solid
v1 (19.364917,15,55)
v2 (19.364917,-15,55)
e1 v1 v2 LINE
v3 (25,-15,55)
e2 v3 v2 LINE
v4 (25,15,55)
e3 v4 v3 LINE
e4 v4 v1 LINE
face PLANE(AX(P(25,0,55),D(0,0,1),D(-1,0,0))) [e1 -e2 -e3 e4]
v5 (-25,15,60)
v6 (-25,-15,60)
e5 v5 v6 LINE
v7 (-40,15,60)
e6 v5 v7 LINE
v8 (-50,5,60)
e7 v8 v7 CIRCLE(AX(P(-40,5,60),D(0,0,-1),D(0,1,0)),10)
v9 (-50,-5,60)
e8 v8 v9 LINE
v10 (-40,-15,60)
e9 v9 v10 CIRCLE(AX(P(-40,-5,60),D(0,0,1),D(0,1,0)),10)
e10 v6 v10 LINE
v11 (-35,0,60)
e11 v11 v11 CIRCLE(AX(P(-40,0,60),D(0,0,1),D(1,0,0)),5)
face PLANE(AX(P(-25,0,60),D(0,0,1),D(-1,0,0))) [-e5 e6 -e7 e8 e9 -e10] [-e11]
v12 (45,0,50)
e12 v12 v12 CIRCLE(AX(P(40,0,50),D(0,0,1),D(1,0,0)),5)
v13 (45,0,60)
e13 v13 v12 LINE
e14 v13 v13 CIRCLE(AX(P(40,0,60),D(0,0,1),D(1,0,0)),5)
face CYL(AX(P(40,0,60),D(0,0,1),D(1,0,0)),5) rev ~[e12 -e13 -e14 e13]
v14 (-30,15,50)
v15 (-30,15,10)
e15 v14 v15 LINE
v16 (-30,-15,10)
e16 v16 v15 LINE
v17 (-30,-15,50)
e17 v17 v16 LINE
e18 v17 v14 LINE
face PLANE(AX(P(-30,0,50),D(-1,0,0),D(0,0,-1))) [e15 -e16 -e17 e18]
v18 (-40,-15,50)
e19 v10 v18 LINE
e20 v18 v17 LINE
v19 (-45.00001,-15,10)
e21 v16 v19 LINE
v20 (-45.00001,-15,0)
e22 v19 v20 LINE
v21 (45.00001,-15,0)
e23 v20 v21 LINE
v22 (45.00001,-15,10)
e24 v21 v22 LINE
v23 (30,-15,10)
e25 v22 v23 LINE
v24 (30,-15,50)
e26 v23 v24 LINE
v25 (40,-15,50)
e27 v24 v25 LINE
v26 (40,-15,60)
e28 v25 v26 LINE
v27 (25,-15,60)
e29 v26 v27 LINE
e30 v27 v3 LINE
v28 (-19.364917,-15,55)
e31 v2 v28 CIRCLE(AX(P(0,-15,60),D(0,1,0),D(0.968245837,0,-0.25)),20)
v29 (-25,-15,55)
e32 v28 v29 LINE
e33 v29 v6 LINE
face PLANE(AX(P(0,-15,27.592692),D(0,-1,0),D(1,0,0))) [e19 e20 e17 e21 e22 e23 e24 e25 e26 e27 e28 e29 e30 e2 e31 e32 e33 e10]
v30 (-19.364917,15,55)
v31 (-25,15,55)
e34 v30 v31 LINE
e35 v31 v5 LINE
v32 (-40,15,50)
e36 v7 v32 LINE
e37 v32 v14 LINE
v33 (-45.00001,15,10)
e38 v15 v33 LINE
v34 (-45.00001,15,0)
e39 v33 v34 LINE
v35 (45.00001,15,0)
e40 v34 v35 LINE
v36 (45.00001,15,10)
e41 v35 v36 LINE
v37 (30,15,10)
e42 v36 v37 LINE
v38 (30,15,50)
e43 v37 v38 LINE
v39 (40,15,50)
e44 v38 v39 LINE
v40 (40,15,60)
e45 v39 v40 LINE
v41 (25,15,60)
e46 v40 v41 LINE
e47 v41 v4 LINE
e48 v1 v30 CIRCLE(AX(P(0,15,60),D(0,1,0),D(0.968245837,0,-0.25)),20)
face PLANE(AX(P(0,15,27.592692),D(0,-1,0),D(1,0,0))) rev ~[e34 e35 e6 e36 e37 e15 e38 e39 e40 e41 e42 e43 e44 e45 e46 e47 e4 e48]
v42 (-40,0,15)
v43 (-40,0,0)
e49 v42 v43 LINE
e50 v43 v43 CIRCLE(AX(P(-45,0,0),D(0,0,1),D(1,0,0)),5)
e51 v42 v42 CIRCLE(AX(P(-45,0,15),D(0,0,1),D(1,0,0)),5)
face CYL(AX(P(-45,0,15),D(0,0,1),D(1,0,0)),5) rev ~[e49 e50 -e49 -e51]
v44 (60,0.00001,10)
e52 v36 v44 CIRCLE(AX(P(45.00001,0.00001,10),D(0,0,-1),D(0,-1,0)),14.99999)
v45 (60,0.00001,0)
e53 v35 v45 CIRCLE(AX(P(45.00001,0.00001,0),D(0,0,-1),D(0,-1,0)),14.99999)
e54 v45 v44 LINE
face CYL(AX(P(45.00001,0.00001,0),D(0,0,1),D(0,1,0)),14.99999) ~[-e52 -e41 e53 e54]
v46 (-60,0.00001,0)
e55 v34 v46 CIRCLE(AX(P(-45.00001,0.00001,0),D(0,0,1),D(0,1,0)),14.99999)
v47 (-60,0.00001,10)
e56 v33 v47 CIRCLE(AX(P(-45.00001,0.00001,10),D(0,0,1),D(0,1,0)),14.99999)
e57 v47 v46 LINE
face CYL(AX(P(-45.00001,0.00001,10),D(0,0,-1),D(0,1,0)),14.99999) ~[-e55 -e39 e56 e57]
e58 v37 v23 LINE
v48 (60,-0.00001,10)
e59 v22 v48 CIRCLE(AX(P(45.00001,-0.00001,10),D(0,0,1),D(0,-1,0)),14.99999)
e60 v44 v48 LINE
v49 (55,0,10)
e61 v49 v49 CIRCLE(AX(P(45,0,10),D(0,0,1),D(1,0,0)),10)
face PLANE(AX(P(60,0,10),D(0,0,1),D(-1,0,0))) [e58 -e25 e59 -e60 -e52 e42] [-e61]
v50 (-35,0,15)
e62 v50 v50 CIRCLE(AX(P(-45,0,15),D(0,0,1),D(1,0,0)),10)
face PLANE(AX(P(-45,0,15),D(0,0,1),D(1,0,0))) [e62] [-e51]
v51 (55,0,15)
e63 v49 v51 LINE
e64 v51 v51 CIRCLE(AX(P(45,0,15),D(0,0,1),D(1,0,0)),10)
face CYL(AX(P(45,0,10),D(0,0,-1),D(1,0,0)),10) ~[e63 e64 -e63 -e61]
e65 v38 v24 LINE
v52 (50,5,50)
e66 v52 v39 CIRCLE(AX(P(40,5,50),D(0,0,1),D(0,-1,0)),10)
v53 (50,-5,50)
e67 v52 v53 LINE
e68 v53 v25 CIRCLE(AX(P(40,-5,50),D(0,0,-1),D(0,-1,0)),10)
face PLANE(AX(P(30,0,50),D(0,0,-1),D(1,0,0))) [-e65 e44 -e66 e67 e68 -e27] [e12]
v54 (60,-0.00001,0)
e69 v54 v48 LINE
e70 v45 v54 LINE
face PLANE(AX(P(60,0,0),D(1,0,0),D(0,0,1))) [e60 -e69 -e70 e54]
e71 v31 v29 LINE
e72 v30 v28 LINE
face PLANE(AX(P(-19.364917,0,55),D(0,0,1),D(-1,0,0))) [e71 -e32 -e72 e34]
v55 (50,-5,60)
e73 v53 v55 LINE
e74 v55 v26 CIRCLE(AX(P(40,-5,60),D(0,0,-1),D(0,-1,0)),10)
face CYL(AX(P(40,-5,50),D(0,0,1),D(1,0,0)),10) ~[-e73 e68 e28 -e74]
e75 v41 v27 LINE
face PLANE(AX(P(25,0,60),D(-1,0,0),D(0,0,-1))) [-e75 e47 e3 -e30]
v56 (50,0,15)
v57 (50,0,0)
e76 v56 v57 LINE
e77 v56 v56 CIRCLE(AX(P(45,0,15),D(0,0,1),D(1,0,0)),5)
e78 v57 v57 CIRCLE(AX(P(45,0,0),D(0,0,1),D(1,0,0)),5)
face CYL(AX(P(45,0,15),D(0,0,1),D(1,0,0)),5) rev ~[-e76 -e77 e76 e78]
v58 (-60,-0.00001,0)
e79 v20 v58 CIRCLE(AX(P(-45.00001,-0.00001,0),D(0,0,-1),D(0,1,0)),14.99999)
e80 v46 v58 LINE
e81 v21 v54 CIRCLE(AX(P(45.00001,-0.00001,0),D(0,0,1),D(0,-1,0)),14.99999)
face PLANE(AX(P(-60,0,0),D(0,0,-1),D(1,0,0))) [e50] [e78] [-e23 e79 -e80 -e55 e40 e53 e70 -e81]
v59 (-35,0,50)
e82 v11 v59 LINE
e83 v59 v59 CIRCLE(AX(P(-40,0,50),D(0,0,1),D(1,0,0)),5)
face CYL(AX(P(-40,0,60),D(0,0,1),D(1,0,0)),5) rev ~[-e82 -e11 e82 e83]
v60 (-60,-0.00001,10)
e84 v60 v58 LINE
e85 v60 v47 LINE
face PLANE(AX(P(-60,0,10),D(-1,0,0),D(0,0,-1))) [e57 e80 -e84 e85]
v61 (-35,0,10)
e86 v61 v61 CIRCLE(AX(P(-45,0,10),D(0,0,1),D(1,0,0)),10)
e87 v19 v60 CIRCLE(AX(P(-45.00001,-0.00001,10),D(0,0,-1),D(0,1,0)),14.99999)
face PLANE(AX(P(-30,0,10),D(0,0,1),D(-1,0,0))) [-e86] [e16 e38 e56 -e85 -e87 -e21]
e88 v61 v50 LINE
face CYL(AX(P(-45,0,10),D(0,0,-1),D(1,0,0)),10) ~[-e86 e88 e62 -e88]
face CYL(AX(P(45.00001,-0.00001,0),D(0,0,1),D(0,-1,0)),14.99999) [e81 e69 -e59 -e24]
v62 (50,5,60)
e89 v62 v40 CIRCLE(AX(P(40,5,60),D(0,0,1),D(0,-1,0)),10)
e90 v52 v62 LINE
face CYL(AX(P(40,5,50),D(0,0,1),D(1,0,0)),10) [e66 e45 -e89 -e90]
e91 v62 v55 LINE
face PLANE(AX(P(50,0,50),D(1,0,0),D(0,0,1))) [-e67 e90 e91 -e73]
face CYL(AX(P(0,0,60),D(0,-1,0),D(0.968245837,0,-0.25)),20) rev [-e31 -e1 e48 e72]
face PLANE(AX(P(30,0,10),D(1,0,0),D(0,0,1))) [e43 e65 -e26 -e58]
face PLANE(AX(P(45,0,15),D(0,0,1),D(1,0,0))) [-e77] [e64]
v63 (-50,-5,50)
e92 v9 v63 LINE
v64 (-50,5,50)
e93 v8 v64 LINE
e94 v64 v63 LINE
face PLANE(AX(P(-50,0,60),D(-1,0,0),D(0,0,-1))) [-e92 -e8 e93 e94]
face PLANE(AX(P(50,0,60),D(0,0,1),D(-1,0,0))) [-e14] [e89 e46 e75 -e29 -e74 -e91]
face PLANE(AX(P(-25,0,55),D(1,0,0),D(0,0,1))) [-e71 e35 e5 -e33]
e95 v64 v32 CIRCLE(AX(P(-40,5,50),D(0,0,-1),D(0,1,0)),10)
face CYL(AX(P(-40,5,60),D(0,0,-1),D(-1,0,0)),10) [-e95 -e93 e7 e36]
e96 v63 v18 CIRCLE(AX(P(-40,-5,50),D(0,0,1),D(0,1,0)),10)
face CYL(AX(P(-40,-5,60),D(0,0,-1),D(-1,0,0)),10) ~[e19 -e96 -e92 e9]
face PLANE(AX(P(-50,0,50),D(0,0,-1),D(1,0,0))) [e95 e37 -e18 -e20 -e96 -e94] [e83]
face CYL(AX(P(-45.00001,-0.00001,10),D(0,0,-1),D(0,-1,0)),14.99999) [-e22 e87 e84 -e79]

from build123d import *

# Parameters (mm, degrees)
F1_DEPTH         = 15
F2_R             = 10
F3_R             = 14.99999
F4_R             = 5
F5_DEPTH         = 10
F6_R             = 10
F7_DEPTH         = 5
F8_R             = 10
F9_DEPTH         = 5
F12_D            = 10
F12_DEPTH        = 15.001
F12_ON_F11_D     = 10
F12_ON_F11_DEPTH = 15.001


# Not quite as in the source:
# - a fillet or chamfer is up to 0.001 mm smaller than in the source, because OpenCascade refuses the exact size


with BuildPart() as f1:
    # F0 (on Front) → F1 (new body, symmetric)
    with BuildSketch(Plane.XZ):
        with BuildLine():
            Line((-60, 10), (-60, 0))
            Line((-60, 0), (60, 0))
            Line((60, 0), (60, 10))
            Line((60, 10), (30, 10))
            Line((30, 10), (30, 50))
            Line((30, 50), (50, 50))
            Line((50, 50), (50, 60))
            Line((50, 60), (25, 60))
            Line((25, 60), (25, 55))
            Line((25, 55), (19.364916731, 55))
            ThreePointArc((19.364916731, 55), (0, 40), (-19.364916731, 55))
            Line((-19.364916731, 55), (-25, 55))
            Line((-25, 55), (-25, 60))
            Line((-25, 60), (-50, 60))
            Line((-50, 60), (-50, 50))
            Line((-50, 50), (-30, 50))
            Line((-30, 50), (-30, 10))
            Line((-30, 10), (-60, 10))
        make_face()
    extrude(amount=F1_DEPTH, both=True)

    # F2
    f2_edges = [f1.edges().sort_by_distance(p)[0] for p in [
        (-50, -15, 55),
        (50, -15, 55),
        (50, 15, 55),
        (-50, 15, 55),
    ]]
    fillet(f2_edges, radius=F2_R)

    # F3 (radius 15 in the source; OpenCascade refuses exactly that, so slightly less here)
    f3_edges = [f1.edges().sort_by_distance(p)[0] for p in [
        (60, 15, 5),
        (-60, 15, 5),
        (-60, -15, 5),
        (60, -15, 5),
    ]]
    fillet(f3_edges, radius=F3_R)

    # F4 (on face) → F5 (cut, through all)
    with BuildSketch(Plane.XY.offset(60)):
        with Locations((40, 0)):
            Circle(F4_R)
        with Locations((-40, 0)):
            Circle(F4_R)
    extrude(amount=-F5_DEPTH, mode=Mode.SUBTRACT)

    # F6 (on face) → F7 (join)
    with BuildSketch(Plane.XY.offset(10)):
        with Locations((45, 0)):
            Circle(F6_R)
    extrude(amount=F7_DEPTH)

    # F8 (on face) → F9 (join)
    with BuildSketch(Plane.XY.offset(10)):
        with Locations((-45, 0)):
            Circle(F8_R)
    extrude(amount=F9_DEPTH)

    # F12 (through all, one way)
    with BuildSketch(Plane.XY.offset(15)):
        with Locations((-45, 0)):
            Circle(F12_D / 2)
    extrude(amount=-F12_DEPTH, mode=Mode.SUBTRACT)

    # F12 on F11 (through all, one way)
    with BuildSketch(Plane.XY.offset(15)):
        with Locations((45, 0)):
            Circle(F12_ON_F11_D / 2)
    extrude(amount=-F12_ON_F11_DEPTH, mode=Mode.SUBTRACT)


solid = f1.part
